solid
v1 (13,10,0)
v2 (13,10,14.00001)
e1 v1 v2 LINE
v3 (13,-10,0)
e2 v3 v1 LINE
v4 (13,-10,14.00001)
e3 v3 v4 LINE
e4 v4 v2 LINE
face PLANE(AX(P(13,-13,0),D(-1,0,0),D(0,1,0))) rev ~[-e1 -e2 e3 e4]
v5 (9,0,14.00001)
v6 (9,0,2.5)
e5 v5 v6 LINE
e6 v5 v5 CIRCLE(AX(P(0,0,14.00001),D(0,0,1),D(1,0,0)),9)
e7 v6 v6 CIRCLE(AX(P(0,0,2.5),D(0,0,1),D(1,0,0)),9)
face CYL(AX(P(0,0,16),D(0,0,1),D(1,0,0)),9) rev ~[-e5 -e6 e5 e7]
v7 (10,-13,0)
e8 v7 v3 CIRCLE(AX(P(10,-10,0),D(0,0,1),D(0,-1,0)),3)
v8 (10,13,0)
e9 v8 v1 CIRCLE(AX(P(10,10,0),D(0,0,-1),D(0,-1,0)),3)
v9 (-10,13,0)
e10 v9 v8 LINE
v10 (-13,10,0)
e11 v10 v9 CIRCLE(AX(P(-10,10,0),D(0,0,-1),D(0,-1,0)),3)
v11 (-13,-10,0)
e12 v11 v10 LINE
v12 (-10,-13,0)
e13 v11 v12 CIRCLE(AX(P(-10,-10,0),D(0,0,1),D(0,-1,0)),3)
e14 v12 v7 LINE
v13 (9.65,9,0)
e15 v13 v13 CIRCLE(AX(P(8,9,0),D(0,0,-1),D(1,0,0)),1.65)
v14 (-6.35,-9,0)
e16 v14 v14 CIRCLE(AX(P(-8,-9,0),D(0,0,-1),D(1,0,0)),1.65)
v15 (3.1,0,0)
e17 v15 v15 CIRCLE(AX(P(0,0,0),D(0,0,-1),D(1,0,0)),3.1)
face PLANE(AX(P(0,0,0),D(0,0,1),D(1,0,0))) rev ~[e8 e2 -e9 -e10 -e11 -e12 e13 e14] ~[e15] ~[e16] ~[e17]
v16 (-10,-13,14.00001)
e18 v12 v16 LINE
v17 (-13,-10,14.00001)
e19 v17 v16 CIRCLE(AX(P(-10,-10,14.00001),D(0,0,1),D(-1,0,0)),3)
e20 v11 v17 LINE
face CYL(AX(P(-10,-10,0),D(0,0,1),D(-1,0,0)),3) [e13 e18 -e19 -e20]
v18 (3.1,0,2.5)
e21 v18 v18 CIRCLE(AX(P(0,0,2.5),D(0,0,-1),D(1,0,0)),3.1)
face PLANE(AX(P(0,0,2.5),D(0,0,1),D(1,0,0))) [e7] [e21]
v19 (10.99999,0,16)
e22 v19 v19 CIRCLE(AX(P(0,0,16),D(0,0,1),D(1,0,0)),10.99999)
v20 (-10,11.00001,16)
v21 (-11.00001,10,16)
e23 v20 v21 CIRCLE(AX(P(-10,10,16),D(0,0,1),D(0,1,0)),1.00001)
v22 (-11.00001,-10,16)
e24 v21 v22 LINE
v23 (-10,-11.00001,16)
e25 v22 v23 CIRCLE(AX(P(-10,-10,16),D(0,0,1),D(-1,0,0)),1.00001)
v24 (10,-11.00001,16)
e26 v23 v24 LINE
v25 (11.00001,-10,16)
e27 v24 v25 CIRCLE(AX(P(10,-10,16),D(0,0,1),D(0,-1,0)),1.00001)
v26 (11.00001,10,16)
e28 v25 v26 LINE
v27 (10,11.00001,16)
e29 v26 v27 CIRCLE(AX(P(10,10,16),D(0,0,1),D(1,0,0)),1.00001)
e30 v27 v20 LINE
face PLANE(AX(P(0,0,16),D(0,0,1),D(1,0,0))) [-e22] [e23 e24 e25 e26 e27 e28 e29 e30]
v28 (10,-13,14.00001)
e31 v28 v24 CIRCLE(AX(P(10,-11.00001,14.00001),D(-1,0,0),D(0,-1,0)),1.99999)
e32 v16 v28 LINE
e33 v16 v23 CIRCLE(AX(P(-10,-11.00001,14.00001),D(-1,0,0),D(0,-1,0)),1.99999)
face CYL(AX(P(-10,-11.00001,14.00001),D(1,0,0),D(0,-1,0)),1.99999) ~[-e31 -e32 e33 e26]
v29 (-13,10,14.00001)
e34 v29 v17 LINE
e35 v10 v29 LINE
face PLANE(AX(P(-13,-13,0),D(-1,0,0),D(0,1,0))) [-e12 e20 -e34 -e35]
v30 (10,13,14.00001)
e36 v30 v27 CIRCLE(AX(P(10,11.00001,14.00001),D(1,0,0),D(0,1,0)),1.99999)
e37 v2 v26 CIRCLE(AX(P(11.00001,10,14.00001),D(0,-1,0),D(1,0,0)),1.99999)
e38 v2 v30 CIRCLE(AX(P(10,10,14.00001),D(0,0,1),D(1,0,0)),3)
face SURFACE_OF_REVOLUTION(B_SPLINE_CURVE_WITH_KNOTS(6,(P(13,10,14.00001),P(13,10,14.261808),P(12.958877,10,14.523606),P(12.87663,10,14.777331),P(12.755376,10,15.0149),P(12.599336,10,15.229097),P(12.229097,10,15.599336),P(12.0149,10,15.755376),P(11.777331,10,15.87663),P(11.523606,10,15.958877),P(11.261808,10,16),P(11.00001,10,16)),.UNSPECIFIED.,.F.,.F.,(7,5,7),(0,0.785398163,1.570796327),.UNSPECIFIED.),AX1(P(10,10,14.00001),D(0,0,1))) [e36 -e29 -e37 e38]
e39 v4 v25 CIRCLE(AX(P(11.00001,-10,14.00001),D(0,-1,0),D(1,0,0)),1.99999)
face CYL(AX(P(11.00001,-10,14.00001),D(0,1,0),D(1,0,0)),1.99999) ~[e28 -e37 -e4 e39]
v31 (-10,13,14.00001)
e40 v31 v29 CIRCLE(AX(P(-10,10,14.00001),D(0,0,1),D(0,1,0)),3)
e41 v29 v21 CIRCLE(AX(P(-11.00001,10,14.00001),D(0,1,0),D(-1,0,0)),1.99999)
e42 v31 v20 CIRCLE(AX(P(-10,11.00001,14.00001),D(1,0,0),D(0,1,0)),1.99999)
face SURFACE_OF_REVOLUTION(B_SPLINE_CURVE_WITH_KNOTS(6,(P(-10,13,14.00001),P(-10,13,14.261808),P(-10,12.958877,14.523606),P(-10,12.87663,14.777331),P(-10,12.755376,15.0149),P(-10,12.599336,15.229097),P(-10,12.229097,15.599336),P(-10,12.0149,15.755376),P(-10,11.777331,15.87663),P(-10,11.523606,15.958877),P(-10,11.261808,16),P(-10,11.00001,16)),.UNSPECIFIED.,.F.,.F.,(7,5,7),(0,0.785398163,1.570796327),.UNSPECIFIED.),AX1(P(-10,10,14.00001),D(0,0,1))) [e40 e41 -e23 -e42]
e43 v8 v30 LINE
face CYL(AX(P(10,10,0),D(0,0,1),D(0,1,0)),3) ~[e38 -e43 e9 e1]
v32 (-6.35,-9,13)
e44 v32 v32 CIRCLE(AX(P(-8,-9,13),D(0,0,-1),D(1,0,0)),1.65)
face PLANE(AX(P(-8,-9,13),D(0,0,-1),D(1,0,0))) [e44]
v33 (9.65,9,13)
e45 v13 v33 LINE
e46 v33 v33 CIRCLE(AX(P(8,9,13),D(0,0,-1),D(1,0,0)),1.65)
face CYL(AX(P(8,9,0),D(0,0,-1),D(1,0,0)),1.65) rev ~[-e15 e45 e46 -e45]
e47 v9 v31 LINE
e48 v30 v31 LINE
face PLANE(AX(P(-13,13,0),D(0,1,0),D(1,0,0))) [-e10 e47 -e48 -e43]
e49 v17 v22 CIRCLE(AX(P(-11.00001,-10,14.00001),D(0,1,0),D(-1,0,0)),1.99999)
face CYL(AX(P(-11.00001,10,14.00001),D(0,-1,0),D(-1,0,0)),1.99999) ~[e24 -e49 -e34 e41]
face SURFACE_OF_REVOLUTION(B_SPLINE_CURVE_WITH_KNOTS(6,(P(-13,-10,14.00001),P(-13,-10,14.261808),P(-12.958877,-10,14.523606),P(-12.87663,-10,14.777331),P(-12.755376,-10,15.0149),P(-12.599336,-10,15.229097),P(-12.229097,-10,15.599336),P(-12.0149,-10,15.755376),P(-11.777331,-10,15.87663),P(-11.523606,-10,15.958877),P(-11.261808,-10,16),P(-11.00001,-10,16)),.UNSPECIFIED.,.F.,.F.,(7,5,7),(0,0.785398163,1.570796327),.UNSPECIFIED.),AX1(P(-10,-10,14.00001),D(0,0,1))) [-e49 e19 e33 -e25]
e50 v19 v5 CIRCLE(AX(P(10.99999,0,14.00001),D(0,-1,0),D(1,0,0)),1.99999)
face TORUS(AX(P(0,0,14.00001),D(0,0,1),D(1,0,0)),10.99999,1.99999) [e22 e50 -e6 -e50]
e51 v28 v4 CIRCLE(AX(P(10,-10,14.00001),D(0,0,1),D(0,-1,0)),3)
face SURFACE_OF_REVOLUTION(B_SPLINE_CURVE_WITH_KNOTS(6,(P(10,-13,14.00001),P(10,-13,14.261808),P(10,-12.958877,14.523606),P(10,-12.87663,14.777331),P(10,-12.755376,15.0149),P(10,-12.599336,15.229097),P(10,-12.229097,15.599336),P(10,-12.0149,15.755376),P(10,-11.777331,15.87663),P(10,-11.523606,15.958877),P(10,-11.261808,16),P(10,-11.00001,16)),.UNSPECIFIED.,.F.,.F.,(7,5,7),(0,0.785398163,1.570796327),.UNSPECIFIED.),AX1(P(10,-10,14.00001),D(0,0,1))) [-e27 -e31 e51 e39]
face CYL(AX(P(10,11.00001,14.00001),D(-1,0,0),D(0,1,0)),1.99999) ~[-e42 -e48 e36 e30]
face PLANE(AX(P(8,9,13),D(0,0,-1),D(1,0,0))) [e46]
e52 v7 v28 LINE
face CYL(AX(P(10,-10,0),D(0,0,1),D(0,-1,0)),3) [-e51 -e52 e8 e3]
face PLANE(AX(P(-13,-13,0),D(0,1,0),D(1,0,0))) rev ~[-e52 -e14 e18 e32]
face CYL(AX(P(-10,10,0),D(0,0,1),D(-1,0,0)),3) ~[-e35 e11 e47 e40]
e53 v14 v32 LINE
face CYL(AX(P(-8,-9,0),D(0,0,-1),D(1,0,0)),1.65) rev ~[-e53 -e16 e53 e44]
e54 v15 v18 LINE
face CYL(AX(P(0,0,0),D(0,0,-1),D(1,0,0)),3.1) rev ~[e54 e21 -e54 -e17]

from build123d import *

# Parameters (mm, degrees)
F0_W     = 26
F0_H     = 26
F1_DEPTH = 16
F2_R     = 9
F3_DEPTH = 13.5
F4_R     = 1.65
F4_R_2   = 3.1
F5_DEPTH = 13
F6_R     = 3
F7_R     = 1.99999


# Not quite as in the source:
# - a fillet or chamfer is up to 0.001 mm smaller than in the source, because OpenCascade refuses the exact size


with BuildPart() as f1:
    # F0 (on Top) → F1 (new body)
    with BuildSketch(Plane.XY):
        Rectangle(F0_W, F0_H)
    extrude(amount=F1_DEPTH)

    # F2 (on face) → F3 (cut)
    with BuildSketch(Plane.XY.offset(16)):
        Circle(F2_R)
    extrude(amount=-F3_DEPTH, mode=Mode.SUBTRACT)

    # F4 (on face) → F5 (cut)
    with BuildSketch(Plane(origin=(0, 0, 0), x_dir=(1, 0, 0), z_dir=(0, 0, -1))):
        with Locations((8, -9)):
            Circle(F4_R)
        Circle(F4_R_2)
        with Locations((-8, 9)):
            Circle(F4_R)
    extrude(amount=-F5_DEPTH, mode=Mode.SUBTRACT)

    # F6
    f6_edges = [f1.edges().sort_by_distance(p)[0] for p in [
        (-13, 13, 8),
        (13, 13, 8),
        (-13, -13, 8),
        (13, -13, 8),
    ]]
    fillet(f6_edges, radius=F6_R)

    # F7 (radius 2 in the source; OpenCascade refuses exactly that, so slightly less here)
    f7_edges = [f1.edges().sort_by_distance(p)[0] for p in [
        (-12.12132, -12.12132, 16),
        (-13, 0, 16),
        (-12.12132, 12.12132, 16),
        (0, 13, 16),
        (12.12132, 12.12132, 16),
        (13, 0, 16),
        (12.12132, -12.12132, 16),
        (0, -13, 16),
        (-9, 0, 16),
    ]]
    fillet(f7_edges, radius=F7_R)


solid = f1.part
